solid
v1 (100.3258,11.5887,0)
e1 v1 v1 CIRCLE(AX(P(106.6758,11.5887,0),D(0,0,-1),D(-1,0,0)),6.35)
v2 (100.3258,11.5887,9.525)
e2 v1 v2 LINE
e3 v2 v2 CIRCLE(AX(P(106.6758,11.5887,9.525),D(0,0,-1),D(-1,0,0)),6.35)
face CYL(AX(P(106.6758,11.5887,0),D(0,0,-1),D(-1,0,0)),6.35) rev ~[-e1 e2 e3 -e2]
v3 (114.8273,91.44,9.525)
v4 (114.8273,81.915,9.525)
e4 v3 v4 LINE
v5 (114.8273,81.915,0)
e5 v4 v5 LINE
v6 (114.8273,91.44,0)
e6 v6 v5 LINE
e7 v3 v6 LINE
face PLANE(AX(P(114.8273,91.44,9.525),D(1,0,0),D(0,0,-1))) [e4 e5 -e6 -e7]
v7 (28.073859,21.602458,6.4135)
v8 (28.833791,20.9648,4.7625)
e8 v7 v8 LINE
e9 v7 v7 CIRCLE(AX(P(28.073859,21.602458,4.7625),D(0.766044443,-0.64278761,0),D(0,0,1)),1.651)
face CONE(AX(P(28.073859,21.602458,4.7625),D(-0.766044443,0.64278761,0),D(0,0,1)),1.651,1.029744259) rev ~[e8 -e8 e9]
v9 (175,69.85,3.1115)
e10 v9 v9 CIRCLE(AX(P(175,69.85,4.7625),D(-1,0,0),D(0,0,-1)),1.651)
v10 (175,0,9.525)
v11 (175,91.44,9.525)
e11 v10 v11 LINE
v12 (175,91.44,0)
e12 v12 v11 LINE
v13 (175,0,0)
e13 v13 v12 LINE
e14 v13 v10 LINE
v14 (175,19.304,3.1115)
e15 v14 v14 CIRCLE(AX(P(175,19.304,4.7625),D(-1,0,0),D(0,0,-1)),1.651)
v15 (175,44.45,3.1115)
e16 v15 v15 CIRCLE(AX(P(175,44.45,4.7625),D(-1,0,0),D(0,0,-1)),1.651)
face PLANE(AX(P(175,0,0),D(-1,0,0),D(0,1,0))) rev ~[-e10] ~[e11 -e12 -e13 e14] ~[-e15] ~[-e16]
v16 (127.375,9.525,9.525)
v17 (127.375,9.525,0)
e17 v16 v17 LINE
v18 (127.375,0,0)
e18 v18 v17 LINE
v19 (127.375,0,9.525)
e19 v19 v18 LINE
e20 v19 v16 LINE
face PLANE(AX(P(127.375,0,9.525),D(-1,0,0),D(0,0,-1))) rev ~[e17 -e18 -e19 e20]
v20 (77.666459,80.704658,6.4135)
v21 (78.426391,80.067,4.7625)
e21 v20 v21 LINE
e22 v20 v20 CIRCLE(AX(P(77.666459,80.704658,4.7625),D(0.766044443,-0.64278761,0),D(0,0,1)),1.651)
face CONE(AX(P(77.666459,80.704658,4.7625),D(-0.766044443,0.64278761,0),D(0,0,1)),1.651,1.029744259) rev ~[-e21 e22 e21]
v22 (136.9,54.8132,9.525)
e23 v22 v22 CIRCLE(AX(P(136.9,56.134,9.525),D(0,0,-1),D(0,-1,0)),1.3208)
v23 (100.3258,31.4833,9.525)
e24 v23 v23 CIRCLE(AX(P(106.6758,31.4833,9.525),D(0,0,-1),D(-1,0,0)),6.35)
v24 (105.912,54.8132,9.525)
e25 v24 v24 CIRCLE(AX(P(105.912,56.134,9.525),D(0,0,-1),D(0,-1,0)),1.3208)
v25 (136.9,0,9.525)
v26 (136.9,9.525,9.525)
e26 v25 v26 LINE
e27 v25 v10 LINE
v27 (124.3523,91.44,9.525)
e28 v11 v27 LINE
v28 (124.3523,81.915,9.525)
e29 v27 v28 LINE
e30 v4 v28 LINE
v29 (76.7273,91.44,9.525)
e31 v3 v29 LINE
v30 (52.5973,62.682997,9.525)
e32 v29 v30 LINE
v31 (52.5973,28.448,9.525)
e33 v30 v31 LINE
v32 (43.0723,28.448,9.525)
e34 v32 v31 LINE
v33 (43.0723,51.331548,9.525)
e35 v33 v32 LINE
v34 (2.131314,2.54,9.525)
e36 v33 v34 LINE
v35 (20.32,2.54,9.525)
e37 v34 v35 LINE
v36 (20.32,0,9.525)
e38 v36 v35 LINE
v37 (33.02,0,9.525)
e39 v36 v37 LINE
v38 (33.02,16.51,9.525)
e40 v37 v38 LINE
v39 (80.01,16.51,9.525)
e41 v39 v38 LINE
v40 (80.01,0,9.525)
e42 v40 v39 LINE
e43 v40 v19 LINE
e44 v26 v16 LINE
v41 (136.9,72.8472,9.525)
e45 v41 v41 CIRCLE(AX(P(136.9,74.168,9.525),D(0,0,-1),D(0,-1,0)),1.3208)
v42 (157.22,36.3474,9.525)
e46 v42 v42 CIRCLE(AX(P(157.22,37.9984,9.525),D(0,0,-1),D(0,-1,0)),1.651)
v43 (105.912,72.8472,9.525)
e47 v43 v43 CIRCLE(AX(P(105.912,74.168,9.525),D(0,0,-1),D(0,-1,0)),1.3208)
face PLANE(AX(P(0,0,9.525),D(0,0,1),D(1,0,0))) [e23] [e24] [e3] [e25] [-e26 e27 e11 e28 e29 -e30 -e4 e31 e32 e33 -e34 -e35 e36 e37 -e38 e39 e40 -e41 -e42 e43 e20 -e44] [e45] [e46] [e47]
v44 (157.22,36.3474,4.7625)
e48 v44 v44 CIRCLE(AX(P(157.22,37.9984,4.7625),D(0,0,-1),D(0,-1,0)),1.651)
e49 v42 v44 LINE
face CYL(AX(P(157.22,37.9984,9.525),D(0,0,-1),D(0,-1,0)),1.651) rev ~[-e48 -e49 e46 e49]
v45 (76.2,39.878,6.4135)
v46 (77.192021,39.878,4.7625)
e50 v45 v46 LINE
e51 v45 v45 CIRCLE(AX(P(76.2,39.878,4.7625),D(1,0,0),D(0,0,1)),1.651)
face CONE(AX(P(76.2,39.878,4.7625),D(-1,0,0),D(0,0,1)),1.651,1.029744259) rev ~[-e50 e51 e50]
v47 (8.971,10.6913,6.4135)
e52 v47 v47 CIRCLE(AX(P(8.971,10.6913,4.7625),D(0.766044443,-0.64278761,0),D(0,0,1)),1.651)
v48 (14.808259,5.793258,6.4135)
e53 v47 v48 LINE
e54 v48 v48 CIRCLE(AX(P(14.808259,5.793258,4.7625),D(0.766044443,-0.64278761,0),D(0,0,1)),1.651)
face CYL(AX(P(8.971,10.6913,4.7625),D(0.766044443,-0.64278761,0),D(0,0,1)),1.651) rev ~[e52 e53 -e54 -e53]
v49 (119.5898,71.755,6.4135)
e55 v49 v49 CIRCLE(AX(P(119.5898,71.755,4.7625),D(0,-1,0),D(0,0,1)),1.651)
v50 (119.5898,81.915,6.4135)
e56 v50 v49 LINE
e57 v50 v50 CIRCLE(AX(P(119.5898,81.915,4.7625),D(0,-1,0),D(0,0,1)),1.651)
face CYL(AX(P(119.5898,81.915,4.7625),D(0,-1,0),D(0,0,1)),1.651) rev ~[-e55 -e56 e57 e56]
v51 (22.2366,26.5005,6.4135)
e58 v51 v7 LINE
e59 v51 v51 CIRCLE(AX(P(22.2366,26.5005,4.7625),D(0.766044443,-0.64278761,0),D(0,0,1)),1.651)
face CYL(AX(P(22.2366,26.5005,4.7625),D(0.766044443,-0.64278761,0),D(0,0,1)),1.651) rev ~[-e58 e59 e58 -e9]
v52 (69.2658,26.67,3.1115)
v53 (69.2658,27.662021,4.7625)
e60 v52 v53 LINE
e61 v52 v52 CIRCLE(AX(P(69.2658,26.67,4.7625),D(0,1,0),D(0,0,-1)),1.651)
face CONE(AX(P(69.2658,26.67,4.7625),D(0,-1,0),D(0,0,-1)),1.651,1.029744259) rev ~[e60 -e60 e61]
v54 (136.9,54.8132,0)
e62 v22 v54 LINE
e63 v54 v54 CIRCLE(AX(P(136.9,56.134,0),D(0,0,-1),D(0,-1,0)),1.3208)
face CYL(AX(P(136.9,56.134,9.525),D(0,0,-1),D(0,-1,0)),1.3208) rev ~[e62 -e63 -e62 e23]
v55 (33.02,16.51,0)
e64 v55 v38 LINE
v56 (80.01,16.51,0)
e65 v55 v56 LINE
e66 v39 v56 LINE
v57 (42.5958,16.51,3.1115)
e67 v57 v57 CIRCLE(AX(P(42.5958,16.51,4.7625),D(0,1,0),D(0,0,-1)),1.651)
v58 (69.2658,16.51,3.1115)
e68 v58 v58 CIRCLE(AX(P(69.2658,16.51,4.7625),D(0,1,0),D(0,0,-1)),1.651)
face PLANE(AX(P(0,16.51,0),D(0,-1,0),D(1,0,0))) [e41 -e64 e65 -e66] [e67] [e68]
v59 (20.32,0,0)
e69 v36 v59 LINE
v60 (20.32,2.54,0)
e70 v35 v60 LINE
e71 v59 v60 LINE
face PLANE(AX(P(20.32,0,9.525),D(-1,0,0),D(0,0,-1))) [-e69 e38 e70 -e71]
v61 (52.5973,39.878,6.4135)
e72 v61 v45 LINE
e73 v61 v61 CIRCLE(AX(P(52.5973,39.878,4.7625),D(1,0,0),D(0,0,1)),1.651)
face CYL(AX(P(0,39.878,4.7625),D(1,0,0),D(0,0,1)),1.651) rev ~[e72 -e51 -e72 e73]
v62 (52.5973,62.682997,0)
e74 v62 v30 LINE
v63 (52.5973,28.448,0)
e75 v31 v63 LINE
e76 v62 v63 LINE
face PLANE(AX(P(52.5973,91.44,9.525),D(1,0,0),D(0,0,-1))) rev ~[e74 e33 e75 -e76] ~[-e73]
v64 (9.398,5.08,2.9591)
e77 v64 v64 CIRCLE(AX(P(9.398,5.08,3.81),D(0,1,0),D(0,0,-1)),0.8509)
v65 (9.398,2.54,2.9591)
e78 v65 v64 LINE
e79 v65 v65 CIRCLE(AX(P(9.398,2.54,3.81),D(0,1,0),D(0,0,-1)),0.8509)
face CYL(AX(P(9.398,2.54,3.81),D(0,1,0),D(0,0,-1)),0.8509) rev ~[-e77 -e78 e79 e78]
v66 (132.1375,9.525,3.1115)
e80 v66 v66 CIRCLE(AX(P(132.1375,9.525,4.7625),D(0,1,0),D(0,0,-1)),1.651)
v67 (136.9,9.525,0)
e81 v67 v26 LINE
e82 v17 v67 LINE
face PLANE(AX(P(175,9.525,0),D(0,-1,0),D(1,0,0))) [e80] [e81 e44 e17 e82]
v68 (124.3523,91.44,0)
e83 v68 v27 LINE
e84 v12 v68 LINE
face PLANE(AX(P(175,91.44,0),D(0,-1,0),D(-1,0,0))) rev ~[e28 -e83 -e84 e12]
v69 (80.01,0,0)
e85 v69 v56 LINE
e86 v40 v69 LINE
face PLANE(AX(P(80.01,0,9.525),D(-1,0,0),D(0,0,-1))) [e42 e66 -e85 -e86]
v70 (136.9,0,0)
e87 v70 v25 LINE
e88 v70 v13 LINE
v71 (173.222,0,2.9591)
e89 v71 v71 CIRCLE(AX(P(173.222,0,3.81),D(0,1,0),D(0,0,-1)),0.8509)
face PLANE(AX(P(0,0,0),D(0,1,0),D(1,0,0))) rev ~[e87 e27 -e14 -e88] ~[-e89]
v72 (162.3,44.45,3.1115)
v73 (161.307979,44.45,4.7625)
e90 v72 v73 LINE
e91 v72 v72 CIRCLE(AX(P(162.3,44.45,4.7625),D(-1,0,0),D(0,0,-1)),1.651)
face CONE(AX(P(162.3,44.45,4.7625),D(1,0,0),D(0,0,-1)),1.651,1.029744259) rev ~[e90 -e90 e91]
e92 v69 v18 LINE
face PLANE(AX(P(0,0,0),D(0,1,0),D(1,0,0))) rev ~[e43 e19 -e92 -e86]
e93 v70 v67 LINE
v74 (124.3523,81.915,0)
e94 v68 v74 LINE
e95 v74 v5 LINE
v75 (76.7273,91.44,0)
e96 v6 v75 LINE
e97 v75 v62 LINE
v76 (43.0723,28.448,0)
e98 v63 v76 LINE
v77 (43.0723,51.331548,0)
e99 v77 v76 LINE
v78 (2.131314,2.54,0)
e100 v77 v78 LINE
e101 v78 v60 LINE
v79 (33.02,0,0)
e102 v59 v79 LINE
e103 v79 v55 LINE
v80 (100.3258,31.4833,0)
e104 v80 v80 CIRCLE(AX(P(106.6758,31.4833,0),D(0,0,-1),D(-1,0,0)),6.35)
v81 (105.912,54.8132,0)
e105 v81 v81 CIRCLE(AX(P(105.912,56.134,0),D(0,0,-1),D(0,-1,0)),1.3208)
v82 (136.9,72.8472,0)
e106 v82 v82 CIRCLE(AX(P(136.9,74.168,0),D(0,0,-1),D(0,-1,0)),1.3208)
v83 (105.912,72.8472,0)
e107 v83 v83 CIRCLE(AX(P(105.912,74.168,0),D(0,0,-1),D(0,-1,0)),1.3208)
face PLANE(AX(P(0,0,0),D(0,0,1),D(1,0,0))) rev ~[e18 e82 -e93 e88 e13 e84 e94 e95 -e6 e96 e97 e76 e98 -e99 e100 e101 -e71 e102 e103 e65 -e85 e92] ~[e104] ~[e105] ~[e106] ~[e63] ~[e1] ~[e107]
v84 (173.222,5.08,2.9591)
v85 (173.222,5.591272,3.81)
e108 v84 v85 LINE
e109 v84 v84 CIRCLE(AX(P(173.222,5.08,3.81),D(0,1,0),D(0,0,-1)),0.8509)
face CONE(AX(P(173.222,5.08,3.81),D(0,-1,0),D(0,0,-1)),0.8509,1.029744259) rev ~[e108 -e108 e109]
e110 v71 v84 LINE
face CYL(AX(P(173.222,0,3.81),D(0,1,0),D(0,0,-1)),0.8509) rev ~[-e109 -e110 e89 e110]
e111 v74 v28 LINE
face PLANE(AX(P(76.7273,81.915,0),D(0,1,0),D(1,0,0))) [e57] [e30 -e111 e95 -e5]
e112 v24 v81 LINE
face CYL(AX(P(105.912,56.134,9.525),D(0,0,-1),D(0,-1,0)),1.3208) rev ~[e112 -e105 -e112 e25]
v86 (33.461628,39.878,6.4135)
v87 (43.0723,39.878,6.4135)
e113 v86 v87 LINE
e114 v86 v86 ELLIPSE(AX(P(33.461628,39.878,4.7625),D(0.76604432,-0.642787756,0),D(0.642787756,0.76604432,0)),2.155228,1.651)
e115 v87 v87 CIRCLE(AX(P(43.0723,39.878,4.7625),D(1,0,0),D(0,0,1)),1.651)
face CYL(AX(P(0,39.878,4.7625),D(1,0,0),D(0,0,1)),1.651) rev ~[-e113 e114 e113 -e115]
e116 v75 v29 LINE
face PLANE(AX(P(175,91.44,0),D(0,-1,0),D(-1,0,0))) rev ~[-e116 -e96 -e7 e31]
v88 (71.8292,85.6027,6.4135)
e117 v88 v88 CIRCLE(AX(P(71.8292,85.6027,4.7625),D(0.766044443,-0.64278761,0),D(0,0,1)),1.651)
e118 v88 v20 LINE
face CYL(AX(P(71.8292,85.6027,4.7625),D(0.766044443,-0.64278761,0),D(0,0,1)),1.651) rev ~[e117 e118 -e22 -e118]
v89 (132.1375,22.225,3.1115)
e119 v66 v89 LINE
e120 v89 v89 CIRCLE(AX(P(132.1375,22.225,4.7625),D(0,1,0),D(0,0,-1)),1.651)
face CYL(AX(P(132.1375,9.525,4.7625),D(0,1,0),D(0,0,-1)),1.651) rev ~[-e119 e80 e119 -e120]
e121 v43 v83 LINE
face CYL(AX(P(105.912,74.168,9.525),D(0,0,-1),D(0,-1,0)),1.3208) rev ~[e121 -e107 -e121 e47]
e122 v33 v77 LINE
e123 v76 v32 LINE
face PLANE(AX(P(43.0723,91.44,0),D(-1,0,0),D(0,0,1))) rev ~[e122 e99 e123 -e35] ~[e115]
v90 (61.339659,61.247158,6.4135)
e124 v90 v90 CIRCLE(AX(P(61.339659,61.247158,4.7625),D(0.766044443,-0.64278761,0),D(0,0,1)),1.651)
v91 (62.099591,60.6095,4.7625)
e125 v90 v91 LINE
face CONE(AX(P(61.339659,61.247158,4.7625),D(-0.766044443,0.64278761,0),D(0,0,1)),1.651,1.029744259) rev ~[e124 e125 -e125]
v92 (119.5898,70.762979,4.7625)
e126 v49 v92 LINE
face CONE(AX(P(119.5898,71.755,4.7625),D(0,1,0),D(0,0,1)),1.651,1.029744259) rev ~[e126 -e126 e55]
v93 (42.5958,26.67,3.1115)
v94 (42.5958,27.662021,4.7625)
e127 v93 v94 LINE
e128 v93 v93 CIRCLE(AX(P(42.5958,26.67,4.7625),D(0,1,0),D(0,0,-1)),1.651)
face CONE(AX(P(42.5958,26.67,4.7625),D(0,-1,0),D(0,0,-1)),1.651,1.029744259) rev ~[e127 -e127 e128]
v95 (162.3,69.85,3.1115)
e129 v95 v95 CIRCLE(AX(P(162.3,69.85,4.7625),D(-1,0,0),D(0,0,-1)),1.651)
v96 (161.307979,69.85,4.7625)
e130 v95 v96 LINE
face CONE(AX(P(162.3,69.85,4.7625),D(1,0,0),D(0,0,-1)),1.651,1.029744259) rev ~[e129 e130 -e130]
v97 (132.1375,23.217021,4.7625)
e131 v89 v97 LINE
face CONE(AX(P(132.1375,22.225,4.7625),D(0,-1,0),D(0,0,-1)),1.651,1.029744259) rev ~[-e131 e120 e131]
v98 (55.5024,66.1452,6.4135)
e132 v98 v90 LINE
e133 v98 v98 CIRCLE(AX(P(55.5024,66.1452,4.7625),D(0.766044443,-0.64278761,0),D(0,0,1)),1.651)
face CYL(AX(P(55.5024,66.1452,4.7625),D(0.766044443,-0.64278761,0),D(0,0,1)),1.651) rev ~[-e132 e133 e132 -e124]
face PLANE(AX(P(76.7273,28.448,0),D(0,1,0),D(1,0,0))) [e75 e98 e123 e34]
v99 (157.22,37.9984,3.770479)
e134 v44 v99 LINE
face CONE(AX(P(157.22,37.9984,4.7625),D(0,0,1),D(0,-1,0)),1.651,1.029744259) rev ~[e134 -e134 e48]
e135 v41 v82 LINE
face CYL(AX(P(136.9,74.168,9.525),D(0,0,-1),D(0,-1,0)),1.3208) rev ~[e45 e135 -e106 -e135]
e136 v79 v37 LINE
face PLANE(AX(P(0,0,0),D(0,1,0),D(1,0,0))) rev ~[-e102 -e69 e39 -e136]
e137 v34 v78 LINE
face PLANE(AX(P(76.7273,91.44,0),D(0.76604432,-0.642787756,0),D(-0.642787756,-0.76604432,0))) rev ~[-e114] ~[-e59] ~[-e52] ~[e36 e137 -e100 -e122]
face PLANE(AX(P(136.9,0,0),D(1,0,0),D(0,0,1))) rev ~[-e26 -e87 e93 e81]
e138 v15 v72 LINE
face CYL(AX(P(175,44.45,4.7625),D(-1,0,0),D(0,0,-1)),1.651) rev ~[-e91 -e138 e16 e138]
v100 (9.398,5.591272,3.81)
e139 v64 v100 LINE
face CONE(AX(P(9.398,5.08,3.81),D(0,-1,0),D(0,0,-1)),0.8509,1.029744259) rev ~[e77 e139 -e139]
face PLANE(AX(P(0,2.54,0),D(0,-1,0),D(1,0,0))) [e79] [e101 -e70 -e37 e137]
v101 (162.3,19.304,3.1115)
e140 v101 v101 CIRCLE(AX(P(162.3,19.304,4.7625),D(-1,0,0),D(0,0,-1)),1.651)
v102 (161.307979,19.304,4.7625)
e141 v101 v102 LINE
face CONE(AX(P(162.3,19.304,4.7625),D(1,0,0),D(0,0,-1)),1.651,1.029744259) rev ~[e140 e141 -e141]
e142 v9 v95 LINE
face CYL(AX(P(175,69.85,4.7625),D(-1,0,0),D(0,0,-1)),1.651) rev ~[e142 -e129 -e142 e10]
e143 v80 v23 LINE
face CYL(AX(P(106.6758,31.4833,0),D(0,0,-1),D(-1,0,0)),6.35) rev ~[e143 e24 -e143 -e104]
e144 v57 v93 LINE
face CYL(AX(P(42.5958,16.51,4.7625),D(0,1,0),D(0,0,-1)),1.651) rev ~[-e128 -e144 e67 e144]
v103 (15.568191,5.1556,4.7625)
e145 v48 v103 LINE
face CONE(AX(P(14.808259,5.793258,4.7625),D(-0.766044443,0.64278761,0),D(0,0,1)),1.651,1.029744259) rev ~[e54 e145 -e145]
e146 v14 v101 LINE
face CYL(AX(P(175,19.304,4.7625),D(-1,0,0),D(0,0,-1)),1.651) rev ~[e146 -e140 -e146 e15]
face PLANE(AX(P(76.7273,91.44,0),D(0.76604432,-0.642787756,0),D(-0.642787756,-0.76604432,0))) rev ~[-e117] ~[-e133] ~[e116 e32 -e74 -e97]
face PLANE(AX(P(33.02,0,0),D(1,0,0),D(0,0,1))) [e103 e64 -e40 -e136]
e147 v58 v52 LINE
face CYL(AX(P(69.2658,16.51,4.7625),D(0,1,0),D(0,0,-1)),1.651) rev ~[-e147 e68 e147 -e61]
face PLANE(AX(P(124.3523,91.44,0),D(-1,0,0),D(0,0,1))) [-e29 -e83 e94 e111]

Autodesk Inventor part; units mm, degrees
ref_plane "YZ Plane" through (0, 0, 0) normal (1, 0, 0) x (0, 1, 0)
ref_plane "XZ Plane" through (0, 0, 0) normal (0, 1, 0) x (-1, 0, 0)
ref_plane "XY Plane" through (0, 0, 0) normal (0, 0, 1) x (1, 0, 0)
sketch "Sketch1" plane through (0, 0, 0) normal (0, 0, 1) x (1, 0, 0)
  line L0 (0, 0) -> (175, 0)
  line L1 (175, 0) -> (175, 91.44)
  line L2 (175, 91.44) -> (76.7273, 91.44)
  line L3 (76.7273, 91.44) -> (0, 0)
  dimension "d0" = 175
  dimension "d1" = 91.44
  dimension "d100" = 50
extrude "Extrusion1" add sketch "Sketch1" along normal blind 9.525
sketch "Sketch8" plane through (0, 0, 0) normal (0, 0, -1) x (-1, 0, 0)
  circle A0 centre (-106.6758, 31.4833) radius 6.35 projected
  circle A1 centre (-106.6758, 11.5887) radius 6.35 projected
  dimension "d101" = 12.7
  dimension "d102" = 12.7
extrude "Extrusion2" cut sketch "Sketch8" against normal blind 25.4
sketch "Sketch9" plane through (0, 0, 0) normal (0, -1, 0) x (1, 0, 0)
  line L0 (175, 9.525) -> (0, 9.525) projected
  line L1 (0, 0) -> (0, 9.525) projected
  line L2 (0, 0) -> (175, 0) projected
  line L3 (33.02, 9.525) -> (80.01, 9.525)
  line L4 (80.01, 9.525) -> (80.01, 0)
  line L5 (80.01, 0) -> (33.02, 0)
  line L6 (33.02, 0) -> (33.02, 9.525)
  dimension "d105" = 33.02
  dimension "d106" = 46.99
extrude "Extrusion3" cut sketch "Sketch9" against normal blind 16.51 contours L4 L2 L6 L0
sketch "Sketch12" plane through (76.7273, 91.44, 0) normal (0, 1, 0) x (1, 0, 0)
  line L0 (-76.7273, -9.525) -> (0, -9.525) projected
  line L1 (0, 0) -> (0, -9.525) projected
  line L2 (0, 0) -> (-76.7273, 0) projected
  line L3 (-76.7273, 0) -> (-76.7273, -9.525) projected
  line L4 (-24.13, 0) -> (-33.655, 0)
  line L5 (-33.655, 0) -> (-33.655, -9.525)
  line L6 (-33.655, -9.525) -> (-24.13, -9.525)
  line L7 (-24.13, -9.525) -> (-24.13, 0)
  dimension "d109" = 24.13
  dimension "d110" = 9.525
extrude "Extrusion4" cut sketch "Sketch12" against normal blind 62.992 contours L5 L2 L7 L0
sketch "Sketch13" plane through (0, 0, 0) normal (0, -1, 0) x (1, 0, 0)
  line L0 (0, 0) -> (33.02, 0) projected
  line L1 (0, 9.525) -> (20.32, 9.525)
  line L2 (20.32, 9.525) -> (20.32, 0)
  line L3 (20.32, 0) -> (0, 0)
  line L4 (0, 0) -> (0, 9.525)
  dimension "d113" = 20.32
extrude "Extrusion5" cut sketch "Sketch13" against normal blind 2.54
sketch "Sketch14" plane through (76.7273, 91.44, 0) normal (0, 1, 0) x (1, 0, 0)
  line L0 (0, -9.525) -> (98.2727, -9.525) projected
  line L1 (98.2727, 0) -> (0, 0) projected
  line L2 (0, 0) -> (0, -9.525) projected
  line L3 (38.1, 0) -> (47.625, 0)
  line L4 (47.625, 0) -> (47.625, -9.525)
  line L5 (47.625, -9.525) -> (38.1, -9.525)
  line L6 (38.1, -9.525) -> (38.1, 0)
  point P0 (-76.7273, 0)
  dimension "d116" = 9.525
  dimension "d117" = 38.1
extrude "Extrusion6" cut sketch "Sketch14" against normal blind 9.525 contours L6 L1 L4 L0
sketch "Sketch15" plane through (175, 0, 0) normal (0, -1, 0) x (1, 0, 0)
  line L0 (-94.99, 0) -> (0, 0) projected
  line L1 (0, 0) -> (0, 9.525) projected
  line L2 (0, 9.525) -> (-94.99, 9.525) projected
  line L3 (-38.1, 9.525) -> (-47.625, 9.525)
  line L4 (-47.625, 9.525) -> (-47.625, 0)
  line L5 (-47.625, 0) -> (-38.1, 0)
  line L6 (-38.1, 0) -> (-38.1, 9.525)
  point P0 (-175, 0)
  dimension "d120" = 38.1
  dimension "d121" = 9.525
extrude "Extrusion7" cut sketch "Sketch15" against normal blind 9.525 contours L4 L2 L6 L0
sketch "Sketch16" plane through (76.7273, 81.915, 0) normal (0, 1, 0) x (1, 0, 0)
  circle A0 centre (42.8625, -4.7625) radius 2.2479 projected
  point P0 (-76.7273, 0)
hole "Hole7" at (119.5898, 81.915, 4.7625) direction (0, -1, 0) diameter 3.302 depth 10.16 tip angle 118 thread size "8-32 UNC" class "2B" standard "ANSI Unified Screw Threads"
sketch "Sketch17" plane through (175, 9.525, 0) normal (0, -1, 0) x (1, 0, 0)
  circle A0 centre (-42.8625, 4.7625) radius 2.2479 projected
  point P0 (-175, 0)
hole "Hole8" at (132.1375, 9.525, 4.7625) direction (0, 1, 0) diameter 3.302 depth 12.7 tip angle 118 thread size "8-32 UNC" class "2B" standard "ANSI Unified Screw Threads"
sketch "Sketch18" plane through (0, 16.51, 0) normal (0, -1, 0) x (1, 0, 0)
  circle A0 centre (42.5958, 4.7625) radius 2.2479 projected
  circle A1 centre (69.2658, 4.7625) radius 2.2479 projected
  point P0 (0, 0)
hole "Hole9" at (42.5958, 16.51, 4.7625) at (69.2658, 16.51, 4.7625) direction (0, 1, 0) diameter 3.302 depth 10.16 tip angle 118 thread size "8-32 UNC" class "2B" standard "ANSI Unified Screw Threads"
sketch "Sketch19" plane through (0, 0, 9.525) normal (0, 0, 1) x (1, 0, 0)
  circle A0 centre (105.912, 74.168) radius 1.8034 projected
  circle A1 centre (105.912, 56.134) radius 1.8034 projected
  circle A2 centre (136.9, 56.134) radius 1.8034 projected
  circle A3 centre (136.9, 74.168) radius 1.8034 projected
  point P0 (0, 0)
hole "Hole10" at (105.912, 74.168, 9.525) at (136.9, 74.168, 9.525) at (136.9, 56.134, 9.525) at (105.912, 56.134, 9.525) direction (0, 0, -1) diameter 2.6416 end through all thread size "6-32 UNC" class "2B" standard "ANSI Unified Screw Threads"
sketch "Sketch20" plane through (175, 0, 0) normal (1, 0, 0) x (0, 0, -1)
  line L0 (0, 0) -> (-9.525, 0) projected
  point P0 (-4.7625, 69.85)
  point P1 (-4.7625, 44.45)
  point P2 (-4.7625, 19.304)
  dimension "d152" = 19.304
  dimension "d153" = 44.45
  dimension "d154" = 69.85
hole "Hole11" at (175, 69.85, 4.7625) at (175, 44.45, 4.7625) at (175, 19.304, 4.7625) direction (-1, 0, 0) diameter 3.302 depth 12.7 tip angle 118 thread size "8-32 UNC" class "2B" standard "ANSI Unified Screw Threads"
sketch "Sketch21" plane through (43.0723, 51.3315, 0) normal (-0.7660444, 0.6427876, 0) x (0, 0, 1)
  circle A0 centre (4.7625, -32.4146) radius 2.2479 projected
  circle A1 centre (4.7625, 19.3379) radius 2.159 projected
  circle A2 centre (4.7625, 44.7379) radius 2.159 projected
  point P0 (0, -67.0086)
hole "Hole12" at (71.8292, 85.6027, 4.7625) at (55.5024, 66.1452, 4.7625) at (22.2366, 26.5005, 4.7625) direction (0.7660444, -0.6427876, 0) diameter 3.302 depth 7.62 tip angle 118 thread size "8-32 UNC" class "2B" standard "ANSI Unified Screw Threads"
sketch "Sketch22" plane through (43.0723, 51.3315, 0) normal (-0.7660444, 0.6427876, 0) x (0, 0, 1)
  circle A0 centre (4.7625, -53.0521) radius 2.159 projected
  point P0 (0, -67.0086)
hole "Hole13" at (8.971, 10.6913, 4.7625) direction (0.7660444, -0.6427876, 0) diameter 3.302 depth 7.62 tip angle 118 thread size "8-32 UNC" class "2B" standard "ANSI Unified Screw Threads"
sketch "Sketch23" plane through (0, 2.54, 0) normal (0, -1, 0) x (1, 0, 0)
  circle A0 centre (9.398, 3.81) radius 1.2192 projected
  point P0 (0, 0)
hole "Hole14" at (9.398, 2.54, 3.81) direction (0, 1, 0) diameter 1.7018 depth 2.54 tip angle 118
sketch "Sketch24" plane through (175, 0, 0) normal (0, -1, 0) x (1, 0, 0)
  circle A0 centre (-1.778, 3.81) radius 1.2192 projected
  point P0 (-175, 0)
hole "Hole15" at (173.222, 0, 3.81) direction (0, 1, 0) diameter 1.7018 depth 5.08 tip angle 118
ref_plane "Work Plane1" through (0, 0, 0) normal (1, 0, 0) x (0, 0, -1)
sketch "Sketch25" plane through (0, 0, 0) normal (1, 0, 0) x (0, 0, -1)
  circle A0 centre (-4.7625, 39.878) radius 2.159 projected
  point P0 (0, 0)
hole "Hole16" at (0, 39.878, 4.7625) direction (1, 0, 0) diameter 3.302 depth 76.2 tip angle 118 thread size "8-32 UNC" class "2B" standard "ANSI Unified Screw Threads"
sketch "Sketch26" plane through (0, 0, 9.525) normal (0, 0, 1) x (1, 0, 0)
  line L0 (139.44, 43.815) -> (175, 43.815) projected
  line L1 (175, 40.64) -> (175, 43.815) projected
  line L2 (139.44, 40.64) -> (175, 40.64) projected
  line L3 (139.44, 40.64) -> (139.44, 43.815) projected
  circle A0 centre (157.22, 37.9984) radius 2.4824
  point P0 (0, 0)
  dimension "d198" = 2.6416
  dimension "d199" = 4.9648
hole "Hole17" at (157.22, 37.9984, 9.525) direction (0, 0, -1) diameter 3.302 depth 4.7625 tip angle 118 thread size "8-32 UNC" class "2B" standard "ANSI Unified Screw Threads"
sketch "Sketch27" plane through (76.7273, 91.44, 0) normal (-0.7660444, 0.6427876, 0) x (0, 0, 1)
  circle A0 centre (4.7625, -33.02) radius 1.651 projected
  circle A1 centre (4.7625, -7.62) radius 1.651 projected
  line L0 (0, -37.5396) -> (9.525, -37.5396) projected
  line L1 (9.525, -37.5396) -> (9.525, 0) projected
  line L2 (0, 0) -> (9.525, 0) projected
  line L3 (0, 0) -> (0, -37.5396) projected
  point P0 (0, -119.3664)
properties part number "Chassis Right3" material "Aluminum-6061"
